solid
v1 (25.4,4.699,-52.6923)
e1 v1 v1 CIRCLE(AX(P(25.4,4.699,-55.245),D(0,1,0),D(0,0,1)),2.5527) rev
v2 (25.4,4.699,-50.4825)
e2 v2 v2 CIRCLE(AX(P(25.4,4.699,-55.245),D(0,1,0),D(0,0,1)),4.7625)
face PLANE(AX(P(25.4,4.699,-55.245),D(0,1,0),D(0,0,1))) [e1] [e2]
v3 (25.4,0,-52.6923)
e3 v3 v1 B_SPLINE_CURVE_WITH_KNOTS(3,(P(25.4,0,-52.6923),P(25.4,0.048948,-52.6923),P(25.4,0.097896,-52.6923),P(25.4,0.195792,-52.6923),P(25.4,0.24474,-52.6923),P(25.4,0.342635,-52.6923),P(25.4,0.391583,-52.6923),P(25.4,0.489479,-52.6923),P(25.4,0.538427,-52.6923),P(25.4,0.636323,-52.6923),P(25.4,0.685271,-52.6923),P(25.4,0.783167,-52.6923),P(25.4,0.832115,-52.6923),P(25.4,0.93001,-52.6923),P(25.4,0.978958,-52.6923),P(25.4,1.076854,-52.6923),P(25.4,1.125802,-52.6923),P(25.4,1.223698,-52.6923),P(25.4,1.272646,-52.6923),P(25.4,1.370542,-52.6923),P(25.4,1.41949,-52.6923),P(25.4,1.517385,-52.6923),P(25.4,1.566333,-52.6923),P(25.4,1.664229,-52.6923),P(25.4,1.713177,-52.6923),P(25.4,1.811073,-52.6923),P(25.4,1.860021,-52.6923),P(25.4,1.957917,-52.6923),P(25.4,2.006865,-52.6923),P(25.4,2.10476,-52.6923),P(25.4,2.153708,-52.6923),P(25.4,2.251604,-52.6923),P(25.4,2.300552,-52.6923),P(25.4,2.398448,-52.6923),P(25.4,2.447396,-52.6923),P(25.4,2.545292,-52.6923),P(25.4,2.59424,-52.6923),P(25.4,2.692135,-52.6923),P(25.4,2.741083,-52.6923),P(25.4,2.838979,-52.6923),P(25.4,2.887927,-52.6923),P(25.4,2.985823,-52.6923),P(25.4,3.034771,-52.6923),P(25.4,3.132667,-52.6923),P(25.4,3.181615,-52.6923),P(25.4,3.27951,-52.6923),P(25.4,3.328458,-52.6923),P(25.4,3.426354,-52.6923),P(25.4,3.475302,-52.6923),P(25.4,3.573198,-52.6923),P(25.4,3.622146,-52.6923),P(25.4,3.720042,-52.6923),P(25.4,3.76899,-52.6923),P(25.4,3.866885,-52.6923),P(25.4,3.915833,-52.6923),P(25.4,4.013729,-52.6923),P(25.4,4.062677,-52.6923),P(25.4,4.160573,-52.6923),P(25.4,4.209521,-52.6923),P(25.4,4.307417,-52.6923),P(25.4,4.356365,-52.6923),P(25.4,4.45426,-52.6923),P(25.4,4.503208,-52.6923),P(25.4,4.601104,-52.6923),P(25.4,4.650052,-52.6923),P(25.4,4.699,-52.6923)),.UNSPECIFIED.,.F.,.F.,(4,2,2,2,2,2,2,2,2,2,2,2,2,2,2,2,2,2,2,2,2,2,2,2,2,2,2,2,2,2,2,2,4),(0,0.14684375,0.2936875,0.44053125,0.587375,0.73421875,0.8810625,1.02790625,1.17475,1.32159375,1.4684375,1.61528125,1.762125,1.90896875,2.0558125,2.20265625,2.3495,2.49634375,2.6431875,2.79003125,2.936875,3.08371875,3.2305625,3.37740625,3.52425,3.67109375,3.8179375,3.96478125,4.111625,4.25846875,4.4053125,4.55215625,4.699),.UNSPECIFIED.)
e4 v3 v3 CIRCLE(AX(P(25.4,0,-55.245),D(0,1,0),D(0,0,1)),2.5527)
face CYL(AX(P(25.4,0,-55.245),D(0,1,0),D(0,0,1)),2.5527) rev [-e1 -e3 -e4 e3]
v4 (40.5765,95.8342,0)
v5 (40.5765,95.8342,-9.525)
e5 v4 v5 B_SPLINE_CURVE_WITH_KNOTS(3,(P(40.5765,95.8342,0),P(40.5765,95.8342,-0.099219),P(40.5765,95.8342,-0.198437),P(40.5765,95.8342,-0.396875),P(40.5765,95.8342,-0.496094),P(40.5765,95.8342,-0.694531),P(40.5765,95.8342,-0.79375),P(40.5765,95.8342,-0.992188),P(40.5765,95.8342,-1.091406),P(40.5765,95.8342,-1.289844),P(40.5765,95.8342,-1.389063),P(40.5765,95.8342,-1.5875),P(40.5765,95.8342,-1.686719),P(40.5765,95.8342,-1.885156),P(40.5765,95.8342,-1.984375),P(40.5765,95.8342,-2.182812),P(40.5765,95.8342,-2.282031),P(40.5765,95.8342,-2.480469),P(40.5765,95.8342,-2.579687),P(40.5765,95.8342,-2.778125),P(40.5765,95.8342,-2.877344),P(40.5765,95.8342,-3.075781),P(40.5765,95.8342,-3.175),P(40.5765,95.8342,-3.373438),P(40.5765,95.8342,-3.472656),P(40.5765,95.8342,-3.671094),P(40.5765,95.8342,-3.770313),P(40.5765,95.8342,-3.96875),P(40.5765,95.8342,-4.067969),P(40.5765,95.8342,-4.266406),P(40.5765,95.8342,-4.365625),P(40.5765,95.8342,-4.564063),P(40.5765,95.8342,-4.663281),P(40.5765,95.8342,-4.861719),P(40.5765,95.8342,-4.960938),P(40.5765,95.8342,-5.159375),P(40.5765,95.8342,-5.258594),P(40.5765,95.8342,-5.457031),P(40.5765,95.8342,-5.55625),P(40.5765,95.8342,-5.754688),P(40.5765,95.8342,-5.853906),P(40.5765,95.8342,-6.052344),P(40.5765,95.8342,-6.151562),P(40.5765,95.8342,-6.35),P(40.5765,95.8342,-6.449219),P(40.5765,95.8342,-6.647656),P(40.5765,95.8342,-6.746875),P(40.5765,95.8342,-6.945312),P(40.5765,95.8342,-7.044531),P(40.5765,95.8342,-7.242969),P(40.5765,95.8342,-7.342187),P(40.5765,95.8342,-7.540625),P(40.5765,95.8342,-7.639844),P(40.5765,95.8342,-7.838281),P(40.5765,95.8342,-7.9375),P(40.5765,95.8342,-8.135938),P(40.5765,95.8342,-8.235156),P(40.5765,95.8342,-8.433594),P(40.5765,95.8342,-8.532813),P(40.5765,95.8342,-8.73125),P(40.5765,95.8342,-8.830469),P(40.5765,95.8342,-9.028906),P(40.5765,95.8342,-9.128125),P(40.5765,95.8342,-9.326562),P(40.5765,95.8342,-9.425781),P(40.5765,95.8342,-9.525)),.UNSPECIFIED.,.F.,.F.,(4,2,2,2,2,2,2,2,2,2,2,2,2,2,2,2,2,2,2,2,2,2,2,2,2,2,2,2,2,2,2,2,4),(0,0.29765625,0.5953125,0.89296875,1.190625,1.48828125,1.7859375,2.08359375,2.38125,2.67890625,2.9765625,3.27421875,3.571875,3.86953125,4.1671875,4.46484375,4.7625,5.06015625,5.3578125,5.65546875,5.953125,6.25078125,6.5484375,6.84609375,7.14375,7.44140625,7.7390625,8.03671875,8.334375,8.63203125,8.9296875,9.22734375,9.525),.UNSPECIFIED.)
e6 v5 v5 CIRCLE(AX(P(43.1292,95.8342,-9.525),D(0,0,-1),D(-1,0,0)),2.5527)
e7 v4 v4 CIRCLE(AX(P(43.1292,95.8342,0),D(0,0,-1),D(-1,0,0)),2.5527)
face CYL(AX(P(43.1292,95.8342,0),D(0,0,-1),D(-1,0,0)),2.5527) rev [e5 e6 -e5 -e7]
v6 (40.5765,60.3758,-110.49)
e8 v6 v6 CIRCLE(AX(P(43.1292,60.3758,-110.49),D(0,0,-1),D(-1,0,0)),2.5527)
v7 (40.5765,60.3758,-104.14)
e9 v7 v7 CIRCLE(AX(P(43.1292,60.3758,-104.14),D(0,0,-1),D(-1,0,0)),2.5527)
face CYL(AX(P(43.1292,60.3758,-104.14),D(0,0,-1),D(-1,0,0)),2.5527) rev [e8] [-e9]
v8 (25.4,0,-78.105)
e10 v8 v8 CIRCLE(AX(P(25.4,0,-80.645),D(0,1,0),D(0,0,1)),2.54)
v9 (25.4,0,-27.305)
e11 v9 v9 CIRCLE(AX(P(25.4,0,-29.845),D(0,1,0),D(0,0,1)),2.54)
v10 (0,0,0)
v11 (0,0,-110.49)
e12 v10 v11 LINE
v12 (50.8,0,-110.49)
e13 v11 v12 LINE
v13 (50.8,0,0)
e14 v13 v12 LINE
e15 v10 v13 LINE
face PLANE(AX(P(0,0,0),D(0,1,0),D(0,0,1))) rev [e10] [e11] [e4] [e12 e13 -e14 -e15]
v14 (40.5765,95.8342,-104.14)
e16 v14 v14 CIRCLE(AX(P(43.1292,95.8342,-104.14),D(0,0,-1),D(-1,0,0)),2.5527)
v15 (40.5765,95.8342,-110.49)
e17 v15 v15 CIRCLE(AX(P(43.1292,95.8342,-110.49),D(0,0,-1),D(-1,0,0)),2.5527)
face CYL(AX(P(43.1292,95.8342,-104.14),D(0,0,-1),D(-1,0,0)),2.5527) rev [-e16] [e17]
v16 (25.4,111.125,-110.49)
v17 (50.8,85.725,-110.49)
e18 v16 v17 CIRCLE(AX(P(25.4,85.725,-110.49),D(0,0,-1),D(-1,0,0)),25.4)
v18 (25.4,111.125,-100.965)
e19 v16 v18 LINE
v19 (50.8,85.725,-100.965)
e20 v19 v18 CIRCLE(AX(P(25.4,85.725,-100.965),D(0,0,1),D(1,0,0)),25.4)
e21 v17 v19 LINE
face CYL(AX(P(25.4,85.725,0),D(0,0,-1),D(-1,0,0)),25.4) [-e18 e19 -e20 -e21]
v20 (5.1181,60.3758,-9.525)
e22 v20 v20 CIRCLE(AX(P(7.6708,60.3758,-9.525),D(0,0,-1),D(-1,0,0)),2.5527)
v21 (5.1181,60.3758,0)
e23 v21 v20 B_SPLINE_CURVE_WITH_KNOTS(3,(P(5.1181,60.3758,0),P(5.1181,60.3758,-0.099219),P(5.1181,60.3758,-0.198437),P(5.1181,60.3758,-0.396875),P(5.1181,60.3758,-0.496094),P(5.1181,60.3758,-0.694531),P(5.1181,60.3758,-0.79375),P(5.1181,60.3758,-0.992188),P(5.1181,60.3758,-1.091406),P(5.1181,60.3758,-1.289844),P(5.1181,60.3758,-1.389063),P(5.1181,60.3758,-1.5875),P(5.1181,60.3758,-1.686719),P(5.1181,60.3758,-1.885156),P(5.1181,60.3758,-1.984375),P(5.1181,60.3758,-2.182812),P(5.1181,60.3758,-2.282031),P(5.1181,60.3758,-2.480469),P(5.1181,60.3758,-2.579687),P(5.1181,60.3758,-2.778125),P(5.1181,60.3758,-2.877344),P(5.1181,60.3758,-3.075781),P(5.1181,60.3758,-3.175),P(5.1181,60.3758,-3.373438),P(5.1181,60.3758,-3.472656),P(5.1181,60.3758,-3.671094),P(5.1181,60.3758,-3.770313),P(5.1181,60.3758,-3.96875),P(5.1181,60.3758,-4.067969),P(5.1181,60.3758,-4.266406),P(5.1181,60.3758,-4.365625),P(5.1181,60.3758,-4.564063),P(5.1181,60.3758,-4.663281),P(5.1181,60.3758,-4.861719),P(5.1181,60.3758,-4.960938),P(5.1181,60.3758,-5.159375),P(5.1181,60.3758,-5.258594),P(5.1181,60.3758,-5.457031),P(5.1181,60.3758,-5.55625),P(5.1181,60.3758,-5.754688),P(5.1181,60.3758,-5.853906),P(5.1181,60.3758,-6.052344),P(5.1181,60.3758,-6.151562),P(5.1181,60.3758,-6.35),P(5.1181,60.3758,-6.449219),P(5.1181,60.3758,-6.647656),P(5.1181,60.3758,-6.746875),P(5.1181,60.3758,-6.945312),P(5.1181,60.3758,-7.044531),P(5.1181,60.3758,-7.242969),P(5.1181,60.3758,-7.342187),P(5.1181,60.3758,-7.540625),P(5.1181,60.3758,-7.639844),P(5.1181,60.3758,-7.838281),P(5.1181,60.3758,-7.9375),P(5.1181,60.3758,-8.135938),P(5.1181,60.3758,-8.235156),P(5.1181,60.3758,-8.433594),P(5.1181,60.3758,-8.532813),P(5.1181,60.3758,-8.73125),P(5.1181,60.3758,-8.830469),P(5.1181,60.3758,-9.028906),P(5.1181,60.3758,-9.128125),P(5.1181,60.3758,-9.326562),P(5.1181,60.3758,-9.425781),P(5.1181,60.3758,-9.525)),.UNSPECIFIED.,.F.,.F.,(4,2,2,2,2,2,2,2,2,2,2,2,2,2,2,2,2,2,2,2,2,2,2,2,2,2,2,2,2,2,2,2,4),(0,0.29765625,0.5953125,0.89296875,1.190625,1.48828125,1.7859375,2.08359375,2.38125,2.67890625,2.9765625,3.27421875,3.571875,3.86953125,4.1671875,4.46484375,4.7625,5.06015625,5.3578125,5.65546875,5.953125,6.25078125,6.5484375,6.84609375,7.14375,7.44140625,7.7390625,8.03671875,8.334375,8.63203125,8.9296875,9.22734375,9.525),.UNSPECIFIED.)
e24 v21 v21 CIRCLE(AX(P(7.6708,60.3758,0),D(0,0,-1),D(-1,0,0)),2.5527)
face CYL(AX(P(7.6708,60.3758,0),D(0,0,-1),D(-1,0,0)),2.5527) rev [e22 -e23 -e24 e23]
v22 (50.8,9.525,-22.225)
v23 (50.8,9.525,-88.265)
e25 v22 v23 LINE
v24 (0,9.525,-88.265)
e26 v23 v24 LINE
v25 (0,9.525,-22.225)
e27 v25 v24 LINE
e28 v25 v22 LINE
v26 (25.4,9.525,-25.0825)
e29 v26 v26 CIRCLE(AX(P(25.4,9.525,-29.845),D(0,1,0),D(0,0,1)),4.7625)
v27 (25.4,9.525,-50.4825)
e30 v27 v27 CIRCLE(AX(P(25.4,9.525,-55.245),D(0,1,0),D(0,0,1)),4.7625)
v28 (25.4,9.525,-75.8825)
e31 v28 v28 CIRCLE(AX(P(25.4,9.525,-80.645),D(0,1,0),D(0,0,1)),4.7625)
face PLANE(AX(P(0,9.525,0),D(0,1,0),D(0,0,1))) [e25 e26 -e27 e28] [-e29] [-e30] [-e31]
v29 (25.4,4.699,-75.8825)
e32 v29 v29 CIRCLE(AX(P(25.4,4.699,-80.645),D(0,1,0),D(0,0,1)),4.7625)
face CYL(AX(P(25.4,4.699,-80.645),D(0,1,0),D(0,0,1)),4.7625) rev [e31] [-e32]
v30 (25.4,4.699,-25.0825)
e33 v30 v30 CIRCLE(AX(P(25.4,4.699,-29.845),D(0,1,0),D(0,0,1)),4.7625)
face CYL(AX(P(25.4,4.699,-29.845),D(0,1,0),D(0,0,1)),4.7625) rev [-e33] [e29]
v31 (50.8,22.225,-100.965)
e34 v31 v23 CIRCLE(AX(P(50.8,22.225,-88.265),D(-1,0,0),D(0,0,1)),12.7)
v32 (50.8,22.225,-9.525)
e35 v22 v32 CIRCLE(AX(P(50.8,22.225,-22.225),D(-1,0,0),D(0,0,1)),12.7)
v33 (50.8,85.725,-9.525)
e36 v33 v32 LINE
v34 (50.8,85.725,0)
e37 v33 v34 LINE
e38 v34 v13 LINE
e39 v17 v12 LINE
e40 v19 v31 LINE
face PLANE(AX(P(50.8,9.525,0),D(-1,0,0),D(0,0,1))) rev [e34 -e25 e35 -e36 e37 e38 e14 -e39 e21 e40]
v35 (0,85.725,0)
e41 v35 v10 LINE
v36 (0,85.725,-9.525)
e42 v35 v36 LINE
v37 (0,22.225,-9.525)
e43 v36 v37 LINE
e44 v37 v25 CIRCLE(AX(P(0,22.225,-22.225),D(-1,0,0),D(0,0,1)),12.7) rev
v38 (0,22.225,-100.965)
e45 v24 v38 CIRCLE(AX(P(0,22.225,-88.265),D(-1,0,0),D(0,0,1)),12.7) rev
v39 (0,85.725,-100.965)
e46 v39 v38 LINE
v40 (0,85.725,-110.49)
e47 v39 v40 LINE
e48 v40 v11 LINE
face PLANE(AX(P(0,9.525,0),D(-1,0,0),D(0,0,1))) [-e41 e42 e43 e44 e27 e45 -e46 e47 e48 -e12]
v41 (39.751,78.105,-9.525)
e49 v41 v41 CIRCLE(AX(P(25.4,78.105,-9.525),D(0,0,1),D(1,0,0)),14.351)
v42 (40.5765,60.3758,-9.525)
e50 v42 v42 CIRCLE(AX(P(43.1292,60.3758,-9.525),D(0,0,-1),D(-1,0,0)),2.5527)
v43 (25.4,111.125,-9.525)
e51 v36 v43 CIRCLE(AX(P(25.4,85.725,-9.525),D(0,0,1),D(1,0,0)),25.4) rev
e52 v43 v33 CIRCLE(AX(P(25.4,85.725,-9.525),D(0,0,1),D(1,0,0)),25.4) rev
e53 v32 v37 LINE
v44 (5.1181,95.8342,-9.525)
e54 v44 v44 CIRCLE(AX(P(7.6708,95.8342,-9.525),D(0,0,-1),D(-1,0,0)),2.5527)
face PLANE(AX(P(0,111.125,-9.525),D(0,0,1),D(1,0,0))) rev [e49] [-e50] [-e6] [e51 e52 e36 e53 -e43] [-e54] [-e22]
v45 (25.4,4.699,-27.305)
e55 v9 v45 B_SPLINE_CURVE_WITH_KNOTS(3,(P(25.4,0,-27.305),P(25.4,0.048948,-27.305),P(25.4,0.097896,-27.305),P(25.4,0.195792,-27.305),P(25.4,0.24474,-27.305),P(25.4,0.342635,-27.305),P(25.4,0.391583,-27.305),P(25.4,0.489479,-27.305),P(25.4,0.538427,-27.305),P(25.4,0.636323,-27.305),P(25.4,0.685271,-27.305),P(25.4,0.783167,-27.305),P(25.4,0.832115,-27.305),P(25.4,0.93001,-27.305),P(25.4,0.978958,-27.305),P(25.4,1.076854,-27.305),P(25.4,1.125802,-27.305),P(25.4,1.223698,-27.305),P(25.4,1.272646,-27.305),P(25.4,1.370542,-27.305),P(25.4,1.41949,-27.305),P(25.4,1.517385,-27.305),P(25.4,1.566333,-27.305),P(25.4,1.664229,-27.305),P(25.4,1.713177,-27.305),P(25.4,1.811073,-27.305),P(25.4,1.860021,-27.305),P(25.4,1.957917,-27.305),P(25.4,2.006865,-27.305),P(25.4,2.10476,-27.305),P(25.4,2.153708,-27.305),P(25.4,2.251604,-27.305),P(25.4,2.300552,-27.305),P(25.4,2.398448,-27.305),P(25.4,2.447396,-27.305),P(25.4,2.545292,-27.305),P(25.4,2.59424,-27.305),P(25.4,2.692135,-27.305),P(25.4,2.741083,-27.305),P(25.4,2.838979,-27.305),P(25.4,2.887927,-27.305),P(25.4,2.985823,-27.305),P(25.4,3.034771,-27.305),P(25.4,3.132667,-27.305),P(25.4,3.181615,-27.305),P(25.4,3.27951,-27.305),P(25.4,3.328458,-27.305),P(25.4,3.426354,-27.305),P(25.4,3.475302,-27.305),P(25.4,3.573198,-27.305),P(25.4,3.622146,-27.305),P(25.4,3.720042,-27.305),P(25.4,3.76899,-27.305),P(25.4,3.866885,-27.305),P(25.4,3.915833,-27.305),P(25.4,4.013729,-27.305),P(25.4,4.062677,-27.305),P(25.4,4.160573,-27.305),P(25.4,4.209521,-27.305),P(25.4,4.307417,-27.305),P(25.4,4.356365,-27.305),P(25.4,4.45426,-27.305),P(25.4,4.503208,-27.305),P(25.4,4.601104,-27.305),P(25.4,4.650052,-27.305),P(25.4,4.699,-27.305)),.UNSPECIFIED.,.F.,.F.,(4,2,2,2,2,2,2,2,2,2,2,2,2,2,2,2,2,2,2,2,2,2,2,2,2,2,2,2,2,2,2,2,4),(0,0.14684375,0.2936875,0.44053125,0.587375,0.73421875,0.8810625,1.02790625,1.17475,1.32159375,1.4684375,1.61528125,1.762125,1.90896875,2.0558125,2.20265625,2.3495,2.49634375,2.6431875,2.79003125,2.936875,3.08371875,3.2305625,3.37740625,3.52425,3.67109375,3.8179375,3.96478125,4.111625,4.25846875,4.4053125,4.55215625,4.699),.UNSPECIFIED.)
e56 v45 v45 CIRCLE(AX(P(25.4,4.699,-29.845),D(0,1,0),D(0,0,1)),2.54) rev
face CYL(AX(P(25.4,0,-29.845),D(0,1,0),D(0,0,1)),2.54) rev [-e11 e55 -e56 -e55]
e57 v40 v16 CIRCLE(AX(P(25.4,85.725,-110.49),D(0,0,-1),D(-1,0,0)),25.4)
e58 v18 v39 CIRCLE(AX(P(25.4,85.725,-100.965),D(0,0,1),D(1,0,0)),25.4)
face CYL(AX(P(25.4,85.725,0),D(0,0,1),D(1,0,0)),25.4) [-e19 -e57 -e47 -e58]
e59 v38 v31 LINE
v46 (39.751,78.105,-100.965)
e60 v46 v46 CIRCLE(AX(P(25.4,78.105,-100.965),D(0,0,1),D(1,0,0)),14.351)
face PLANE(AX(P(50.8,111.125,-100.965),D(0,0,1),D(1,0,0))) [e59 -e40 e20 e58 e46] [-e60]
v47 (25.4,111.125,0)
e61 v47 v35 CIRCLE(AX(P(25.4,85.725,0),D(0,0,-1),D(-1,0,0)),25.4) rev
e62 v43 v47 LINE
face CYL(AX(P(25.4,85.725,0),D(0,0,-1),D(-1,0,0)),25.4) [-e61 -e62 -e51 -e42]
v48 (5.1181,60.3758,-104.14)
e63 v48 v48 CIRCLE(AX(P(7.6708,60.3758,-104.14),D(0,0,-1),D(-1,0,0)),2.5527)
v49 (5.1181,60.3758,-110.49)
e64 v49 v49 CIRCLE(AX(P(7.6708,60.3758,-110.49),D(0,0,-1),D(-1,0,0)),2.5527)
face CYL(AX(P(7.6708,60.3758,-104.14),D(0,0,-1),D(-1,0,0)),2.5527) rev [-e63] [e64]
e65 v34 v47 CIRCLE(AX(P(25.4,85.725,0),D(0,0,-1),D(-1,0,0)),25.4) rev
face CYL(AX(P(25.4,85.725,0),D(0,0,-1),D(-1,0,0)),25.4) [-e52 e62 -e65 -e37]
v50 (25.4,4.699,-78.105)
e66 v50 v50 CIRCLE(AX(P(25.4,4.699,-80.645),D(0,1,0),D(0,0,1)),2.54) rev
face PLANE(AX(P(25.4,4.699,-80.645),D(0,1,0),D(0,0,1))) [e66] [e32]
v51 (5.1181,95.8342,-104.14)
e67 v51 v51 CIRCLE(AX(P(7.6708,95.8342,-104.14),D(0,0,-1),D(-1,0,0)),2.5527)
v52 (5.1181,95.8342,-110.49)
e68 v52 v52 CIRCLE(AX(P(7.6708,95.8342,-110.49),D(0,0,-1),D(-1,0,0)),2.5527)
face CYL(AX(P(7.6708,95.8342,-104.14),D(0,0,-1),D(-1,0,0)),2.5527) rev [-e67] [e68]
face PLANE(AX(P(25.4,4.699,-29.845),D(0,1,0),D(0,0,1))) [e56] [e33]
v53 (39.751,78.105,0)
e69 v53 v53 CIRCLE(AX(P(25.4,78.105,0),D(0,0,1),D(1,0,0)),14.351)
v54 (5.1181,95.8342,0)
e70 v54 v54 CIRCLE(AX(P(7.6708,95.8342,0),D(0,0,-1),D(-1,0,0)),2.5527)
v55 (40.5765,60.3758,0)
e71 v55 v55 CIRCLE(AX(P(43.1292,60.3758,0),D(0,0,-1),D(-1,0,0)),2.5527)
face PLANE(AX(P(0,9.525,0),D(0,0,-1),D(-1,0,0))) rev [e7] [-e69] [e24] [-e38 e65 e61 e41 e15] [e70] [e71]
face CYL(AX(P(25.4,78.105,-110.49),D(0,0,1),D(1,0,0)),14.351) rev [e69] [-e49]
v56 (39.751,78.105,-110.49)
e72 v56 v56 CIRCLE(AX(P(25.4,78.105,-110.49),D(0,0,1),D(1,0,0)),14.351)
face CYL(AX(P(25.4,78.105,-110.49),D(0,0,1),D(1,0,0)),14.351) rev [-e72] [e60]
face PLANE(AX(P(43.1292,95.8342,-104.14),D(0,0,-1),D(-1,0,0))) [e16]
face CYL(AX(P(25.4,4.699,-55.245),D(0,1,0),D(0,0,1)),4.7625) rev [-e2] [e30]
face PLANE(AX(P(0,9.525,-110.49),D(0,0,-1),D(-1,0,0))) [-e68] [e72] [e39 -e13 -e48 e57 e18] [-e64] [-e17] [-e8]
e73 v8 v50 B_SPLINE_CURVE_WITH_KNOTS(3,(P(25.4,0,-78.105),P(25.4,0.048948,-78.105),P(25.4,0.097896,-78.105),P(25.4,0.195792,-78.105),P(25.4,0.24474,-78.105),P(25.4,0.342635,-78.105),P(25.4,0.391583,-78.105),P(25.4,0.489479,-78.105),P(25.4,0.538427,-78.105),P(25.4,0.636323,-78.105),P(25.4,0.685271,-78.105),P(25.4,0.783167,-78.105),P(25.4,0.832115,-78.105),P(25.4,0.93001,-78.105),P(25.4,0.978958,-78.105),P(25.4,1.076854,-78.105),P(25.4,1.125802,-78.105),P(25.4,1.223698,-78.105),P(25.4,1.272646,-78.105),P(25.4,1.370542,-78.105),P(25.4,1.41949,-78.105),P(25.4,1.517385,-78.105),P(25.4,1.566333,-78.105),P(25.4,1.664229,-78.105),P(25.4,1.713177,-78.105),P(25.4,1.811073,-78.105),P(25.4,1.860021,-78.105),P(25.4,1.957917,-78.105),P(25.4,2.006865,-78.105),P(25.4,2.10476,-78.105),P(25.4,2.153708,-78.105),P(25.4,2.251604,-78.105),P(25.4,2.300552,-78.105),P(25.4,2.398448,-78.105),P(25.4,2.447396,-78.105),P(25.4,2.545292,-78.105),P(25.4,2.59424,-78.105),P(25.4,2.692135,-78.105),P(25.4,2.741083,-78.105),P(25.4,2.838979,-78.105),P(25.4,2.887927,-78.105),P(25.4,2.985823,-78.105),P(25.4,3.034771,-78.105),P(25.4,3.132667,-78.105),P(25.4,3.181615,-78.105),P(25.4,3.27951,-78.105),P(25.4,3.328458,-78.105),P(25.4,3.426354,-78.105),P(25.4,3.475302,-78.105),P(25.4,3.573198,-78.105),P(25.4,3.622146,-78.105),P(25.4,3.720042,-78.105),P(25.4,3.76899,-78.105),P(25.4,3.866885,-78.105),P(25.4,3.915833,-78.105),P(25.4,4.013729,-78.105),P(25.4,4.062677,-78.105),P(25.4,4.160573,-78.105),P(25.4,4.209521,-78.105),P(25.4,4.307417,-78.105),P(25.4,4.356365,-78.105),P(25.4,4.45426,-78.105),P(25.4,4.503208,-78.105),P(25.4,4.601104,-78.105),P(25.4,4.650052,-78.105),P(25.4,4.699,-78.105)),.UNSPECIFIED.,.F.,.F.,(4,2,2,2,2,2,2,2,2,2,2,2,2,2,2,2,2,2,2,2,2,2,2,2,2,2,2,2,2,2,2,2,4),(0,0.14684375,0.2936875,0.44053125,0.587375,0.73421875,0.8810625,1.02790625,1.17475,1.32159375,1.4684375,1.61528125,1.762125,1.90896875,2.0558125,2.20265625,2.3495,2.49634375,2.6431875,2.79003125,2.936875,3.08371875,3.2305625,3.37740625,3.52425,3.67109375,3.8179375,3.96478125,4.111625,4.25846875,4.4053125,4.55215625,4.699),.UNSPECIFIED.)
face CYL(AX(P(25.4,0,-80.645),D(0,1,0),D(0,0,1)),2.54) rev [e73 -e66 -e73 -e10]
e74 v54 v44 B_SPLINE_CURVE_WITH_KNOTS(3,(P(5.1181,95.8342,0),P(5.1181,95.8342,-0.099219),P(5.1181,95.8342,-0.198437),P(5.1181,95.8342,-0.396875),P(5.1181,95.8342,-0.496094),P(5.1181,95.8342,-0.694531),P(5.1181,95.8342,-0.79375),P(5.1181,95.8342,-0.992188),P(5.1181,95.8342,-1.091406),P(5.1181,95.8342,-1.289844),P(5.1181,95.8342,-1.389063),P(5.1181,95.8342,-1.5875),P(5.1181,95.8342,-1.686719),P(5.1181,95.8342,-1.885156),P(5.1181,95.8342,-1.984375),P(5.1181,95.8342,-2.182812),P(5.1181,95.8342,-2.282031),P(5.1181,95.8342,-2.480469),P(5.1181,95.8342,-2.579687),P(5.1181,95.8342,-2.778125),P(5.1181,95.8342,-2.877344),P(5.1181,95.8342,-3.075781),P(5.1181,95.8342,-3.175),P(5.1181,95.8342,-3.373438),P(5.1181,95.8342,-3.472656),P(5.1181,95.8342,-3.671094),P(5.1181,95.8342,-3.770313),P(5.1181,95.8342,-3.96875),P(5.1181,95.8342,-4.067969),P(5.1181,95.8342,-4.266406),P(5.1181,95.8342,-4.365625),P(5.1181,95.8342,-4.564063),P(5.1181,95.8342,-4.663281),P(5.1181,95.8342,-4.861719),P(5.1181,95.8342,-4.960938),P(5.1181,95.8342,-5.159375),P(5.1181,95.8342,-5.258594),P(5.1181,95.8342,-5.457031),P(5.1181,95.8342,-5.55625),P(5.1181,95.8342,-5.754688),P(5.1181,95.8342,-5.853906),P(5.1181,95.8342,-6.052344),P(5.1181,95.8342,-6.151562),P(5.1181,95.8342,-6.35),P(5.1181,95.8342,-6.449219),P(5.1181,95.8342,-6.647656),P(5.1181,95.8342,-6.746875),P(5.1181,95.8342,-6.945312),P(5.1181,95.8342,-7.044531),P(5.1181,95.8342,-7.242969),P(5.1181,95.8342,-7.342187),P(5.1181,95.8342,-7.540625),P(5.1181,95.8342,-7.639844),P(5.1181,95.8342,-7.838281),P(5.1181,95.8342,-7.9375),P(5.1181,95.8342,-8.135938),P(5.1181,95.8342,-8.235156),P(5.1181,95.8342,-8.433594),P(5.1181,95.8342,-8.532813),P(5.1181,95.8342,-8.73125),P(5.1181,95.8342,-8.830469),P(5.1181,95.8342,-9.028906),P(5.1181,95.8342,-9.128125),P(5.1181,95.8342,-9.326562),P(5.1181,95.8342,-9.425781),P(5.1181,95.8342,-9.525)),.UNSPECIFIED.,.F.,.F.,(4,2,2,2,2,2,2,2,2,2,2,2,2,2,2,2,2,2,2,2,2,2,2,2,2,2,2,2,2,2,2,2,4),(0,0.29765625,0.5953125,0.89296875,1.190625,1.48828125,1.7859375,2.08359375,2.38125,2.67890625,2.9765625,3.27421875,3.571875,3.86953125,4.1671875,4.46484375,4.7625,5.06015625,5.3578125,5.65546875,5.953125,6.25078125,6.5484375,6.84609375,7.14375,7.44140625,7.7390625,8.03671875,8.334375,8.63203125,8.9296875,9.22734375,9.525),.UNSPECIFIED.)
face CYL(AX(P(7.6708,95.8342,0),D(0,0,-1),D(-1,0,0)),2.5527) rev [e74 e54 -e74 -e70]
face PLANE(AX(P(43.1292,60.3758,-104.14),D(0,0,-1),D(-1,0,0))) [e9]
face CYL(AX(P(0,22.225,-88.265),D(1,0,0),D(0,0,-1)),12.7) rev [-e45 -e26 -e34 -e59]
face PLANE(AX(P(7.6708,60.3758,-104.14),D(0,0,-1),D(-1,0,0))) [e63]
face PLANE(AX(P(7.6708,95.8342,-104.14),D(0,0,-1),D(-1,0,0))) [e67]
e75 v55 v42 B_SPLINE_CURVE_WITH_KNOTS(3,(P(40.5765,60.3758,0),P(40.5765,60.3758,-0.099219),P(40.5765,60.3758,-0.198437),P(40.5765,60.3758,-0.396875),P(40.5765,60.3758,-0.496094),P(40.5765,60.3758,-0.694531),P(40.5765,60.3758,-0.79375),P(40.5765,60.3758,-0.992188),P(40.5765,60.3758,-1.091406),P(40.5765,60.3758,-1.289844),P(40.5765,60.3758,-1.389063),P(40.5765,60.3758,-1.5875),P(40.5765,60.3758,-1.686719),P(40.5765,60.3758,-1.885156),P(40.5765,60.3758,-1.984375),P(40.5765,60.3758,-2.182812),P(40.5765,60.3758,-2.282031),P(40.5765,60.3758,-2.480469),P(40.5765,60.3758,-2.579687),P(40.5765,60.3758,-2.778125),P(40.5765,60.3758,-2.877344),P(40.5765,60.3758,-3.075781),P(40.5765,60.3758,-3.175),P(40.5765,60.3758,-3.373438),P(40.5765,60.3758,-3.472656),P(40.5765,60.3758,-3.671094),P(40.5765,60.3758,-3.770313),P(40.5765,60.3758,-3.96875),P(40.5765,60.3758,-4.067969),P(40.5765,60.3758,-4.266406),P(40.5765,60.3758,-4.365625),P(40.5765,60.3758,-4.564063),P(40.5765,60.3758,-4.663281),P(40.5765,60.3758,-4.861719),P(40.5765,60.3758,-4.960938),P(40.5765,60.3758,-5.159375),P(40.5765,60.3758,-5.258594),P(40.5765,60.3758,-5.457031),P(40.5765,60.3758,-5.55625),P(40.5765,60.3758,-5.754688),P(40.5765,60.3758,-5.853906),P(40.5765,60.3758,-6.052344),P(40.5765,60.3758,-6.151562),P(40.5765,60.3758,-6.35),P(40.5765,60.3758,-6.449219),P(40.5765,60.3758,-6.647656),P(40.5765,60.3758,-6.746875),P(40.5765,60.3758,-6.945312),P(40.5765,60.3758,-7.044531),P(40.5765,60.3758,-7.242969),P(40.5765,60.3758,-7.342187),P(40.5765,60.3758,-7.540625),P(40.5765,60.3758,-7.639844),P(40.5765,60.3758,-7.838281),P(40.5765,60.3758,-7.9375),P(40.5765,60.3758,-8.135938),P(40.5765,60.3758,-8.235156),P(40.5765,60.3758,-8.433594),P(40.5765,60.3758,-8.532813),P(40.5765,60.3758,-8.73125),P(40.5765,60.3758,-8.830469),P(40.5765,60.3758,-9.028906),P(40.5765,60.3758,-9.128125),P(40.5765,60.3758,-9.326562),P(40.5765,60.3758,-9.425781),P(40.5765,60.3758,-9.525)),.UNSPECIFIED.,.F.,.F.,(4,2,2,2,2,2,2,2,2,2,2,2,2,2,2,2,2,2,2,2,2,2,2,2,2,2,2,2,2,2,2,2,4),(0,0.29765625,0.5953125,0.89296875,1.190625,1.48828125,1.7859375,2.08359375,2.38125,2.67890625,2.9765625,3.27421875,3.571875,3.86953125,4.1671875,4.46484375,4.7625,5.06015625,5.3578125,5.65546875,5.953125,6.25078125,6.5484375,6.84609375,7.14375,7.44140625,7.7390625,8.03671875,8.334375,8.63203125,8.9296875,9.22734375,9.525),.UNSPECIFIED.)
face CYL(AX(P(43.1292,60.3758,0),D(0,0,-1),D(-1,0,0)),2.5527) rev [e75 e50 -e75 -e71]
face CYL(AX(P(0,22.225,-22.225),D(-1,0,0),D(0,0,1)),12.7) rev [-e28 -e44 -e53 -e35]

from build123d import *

# Parameters (mm, degrees)
SKETCH1_W           = 50.8
SKETCH1_H           = 110.49
BOSS_EXTRUDE1_DEPTH = 9.525
SKETCH2_W           = 50.8
SKETCH2_H           = 9.525
BOSS_EXTRUDE2_DEPTH = 101.6
SKETCH3_W           = 50.8
SKETCH3_H           = 9.525
BOSS_EXTRUDE3_DEPTH = 101.6
SKETCH8_R           = 14.351
CUT_EXTRUDE7_DEPTH  = 165.734470361
SKETCH9_R           = 2.5527
CUT_EXTRUDE8_DEPTH  = 159.503428512
SKETCH10_R          = 2.5527
CUT_EXTRUDE9_DEPTH  = 6.35
FILLET5_R           = 25.4
FILLET6_R           = 25.4
FILLET7_R           = 25.4
FILLET8_R           = 25.4
SKETCH11_R          = 2.5527
CUT_EXTRUDE10_DEPTH = 159.465264648
SKETCH12_R          = 2.54
CUT_EXTRUDE11_DEPTH = 159.465264648
FILLET9_R           = 12.7
SKETCH13_R          = 4.7625
CUT_EXTRUDE12_DEPTH = 4.826


with BuildPart() as part:
    # Sketch1 → Boss-Extrude1 (new body)
    with BuildSketch(Plane(origin=(0, 0, 0), x_dir=(1, 0, 0), z_dir=(0, 1, 0))):
        with Locations((25.4, 55.245)):
            Rectangle(SKETCH1_W, SKETCH1_H)
    extrude(amount=BOSS_EXTRUDE1_DEPTH)

    # Sketch2 → Boss-Extrude2 (add)
    with BuildSketch(Plane(origin=(0, 9.525, 0), x_dir=(1, 0, 0), z_dir=(0, 1, 0))):
        with Locations((25.4, 105.7275)):
            Rectangle(SKETCH2_W, SKETCH2_H)
    extrude(amount=BOSS_EXTRUDE2_DEPTH)

    # Sketch3 → Boss-Extrude3 (add)
    with BuildSketch(Plane(origin=(0, 9.525, 0), x_dir=(1, 0, 0), z_dir=(0, 1, 0))):
        with Locations((25.4, 4.7625)):
            Rectangle(SKETCH3_W, SKETCH3_H)
    extrude(amount=BOSS_EXTRUDE3_DEPTH)

    # Sketch8 → Cut-Extrude7 (cut, through all)
    with BuildSketch(Plane.XY):
        with Locations((25.4, 78.105)):
            Circle(SKETCH8_R)
    extrude(amount=-CUT_EXTRUDE7_DEPTH, mode=Mode.SUBTRACT)

    # Sketch9 → Cut-Extrude8 (cut, through all)
    with BuildSketch(Plane(origin=(0, 0, -9.525), x_dir=(-1, 0, 0), z_dir=(0, 0, -1))):
        with Locations((-43.1292, 95.8342)):
            Circle(SKETCH9_R)
        with Locations((-7.6708, 95.8342)):
            Circle(SKETCH9_R)
        with Locations((-7.6708, 60.3758)):
            Circle(SKETCH9_R)
        with Locations((-43.1292, 60.3758)):
            Circle(SKETCH9_R)
    extrude(amount=-CUT_EXTRUDE8_DEPTH, mode=Mode.SUBTRACT)

    # Sketch10 → Cut-Extrude9 (cut)
    with BuildSketch(Plane(origin=(0, 0, -110.49), x_dir=(-1, 0, 0), z_dir=(0, 0, -1))):
        with Locations((-43.1292, 95.8342)):
            Circle(SKETCH10_R)
        with Locations((-7.6708, 95.8342)):
            Circle(SKETCH10_R)
        with Locations((-7.6708, 60.3758)):
            Circle(SKETCH10_R)
        with Locations((-43.1292, 60.3758)):
            Circle(SKETCH10_R)
    extrude(amount=-CUT_EXTRUDE9_DEPTH, mode=Mode.SUBTRACT)

    # Fillet5
    fillet5_edges = [part.edges().sort_by_distance(p)[0] for p in [
        (0, 111.125, -4.7625),
    ]]
    fillet(fillet5_edges, radius=FILLET5_R)

    # Fillet6
    fillet6_edges = [part.edges().sort_by_distance(p)[0] for p in [
        (50.8, 111.125, -4.7625),
    ]]
    fillet(fillet6_edges, radius=FILLET6_R - 0.0001)  # a hair under: the kernel refuses the full size

    # Fillet7
    fillet7_edges = [part.edges().sort_by_distance(p)[0] for p in [
        (0, 111.125, -105.7275),
    ]]
    fillet(fillet7_edges, radius=FILLET7_R)

    # Fillet8
    fillet8_edges = [part.edges().sort_by_distance(p)[0] for p in [
        (50.8, 111.125, -105.7275),
    ]]
    fillet(fillet8_edges, radius=FILLET8_R - 0.0001)  # a hair under: the kernel refuses the full size

    # Sketch11 → Cut-Extrude10 (cut, through all)
    with BuildSketch(Plane(origin=(0, 9.525, 0), x_dir=(1, 0, 0), z_dir=(0, 1, 0))):
        with Locations(Location((25.4, 55.245, 0), (0, 0, 270))):
            Circle(SKETCH11_R)
    extrude(amount=-CUT_EXTRUDE10_DEPTH, mode=Mode.SUBTRACT)

    # Sketch12 → Cut-Extrude11 (cut, through all)
    with BuildSketch(Plane(origin=(0, 9.525, 0), x_dir=(1, 0, 0), z_dir=(0, 1, 0))):
        with Locations(Location((25.4, 29.845, 0), (0, 0, 270))):
            Circle(SKETCH12_R)
        with Locations(Location((25.4, 80.645, 0), (0, 0, 270))):
            Circle(SKETCH12_R)
    extrude(amount=-CUT_EXTRUDE11_DEPTH, mode=Mode.SUBTRACT)

    # Fillet9
    fillet9_edges = [part.edges().sort_by_distance(p)[0] for p in [
        (25.4, 9.525, -100.965),
        (25.4, 9.525, -9.525),
    ]]
    fillet(fillet9_edges, radius=FILLET9_R)

    # Sketch13 → Cut-Extrude12 (cut)
    with BuildSketch(Plane(origin=(0, 9.525, 0), x_dir=(1, 0, 0), z_dir=(0, 1, 0))):
        with Locations(Location((25.4, 55.245, 0), (0, 0, 270))):
            Circle(SKETCH13_R)
        with Locations(Location((25.4, 29.845, 0), (0, 0, 270))):
            Circle(SKETCH13_R)
        with Locations(Location((25.4, 80.645, 0), (0, 0, 270))):
            Circle(SKETCH13_R)
    extrude(amount=-CUT_EXTRUDE12_DEPTH, mode=Mode.SUBTRACT)


solid = part.part
